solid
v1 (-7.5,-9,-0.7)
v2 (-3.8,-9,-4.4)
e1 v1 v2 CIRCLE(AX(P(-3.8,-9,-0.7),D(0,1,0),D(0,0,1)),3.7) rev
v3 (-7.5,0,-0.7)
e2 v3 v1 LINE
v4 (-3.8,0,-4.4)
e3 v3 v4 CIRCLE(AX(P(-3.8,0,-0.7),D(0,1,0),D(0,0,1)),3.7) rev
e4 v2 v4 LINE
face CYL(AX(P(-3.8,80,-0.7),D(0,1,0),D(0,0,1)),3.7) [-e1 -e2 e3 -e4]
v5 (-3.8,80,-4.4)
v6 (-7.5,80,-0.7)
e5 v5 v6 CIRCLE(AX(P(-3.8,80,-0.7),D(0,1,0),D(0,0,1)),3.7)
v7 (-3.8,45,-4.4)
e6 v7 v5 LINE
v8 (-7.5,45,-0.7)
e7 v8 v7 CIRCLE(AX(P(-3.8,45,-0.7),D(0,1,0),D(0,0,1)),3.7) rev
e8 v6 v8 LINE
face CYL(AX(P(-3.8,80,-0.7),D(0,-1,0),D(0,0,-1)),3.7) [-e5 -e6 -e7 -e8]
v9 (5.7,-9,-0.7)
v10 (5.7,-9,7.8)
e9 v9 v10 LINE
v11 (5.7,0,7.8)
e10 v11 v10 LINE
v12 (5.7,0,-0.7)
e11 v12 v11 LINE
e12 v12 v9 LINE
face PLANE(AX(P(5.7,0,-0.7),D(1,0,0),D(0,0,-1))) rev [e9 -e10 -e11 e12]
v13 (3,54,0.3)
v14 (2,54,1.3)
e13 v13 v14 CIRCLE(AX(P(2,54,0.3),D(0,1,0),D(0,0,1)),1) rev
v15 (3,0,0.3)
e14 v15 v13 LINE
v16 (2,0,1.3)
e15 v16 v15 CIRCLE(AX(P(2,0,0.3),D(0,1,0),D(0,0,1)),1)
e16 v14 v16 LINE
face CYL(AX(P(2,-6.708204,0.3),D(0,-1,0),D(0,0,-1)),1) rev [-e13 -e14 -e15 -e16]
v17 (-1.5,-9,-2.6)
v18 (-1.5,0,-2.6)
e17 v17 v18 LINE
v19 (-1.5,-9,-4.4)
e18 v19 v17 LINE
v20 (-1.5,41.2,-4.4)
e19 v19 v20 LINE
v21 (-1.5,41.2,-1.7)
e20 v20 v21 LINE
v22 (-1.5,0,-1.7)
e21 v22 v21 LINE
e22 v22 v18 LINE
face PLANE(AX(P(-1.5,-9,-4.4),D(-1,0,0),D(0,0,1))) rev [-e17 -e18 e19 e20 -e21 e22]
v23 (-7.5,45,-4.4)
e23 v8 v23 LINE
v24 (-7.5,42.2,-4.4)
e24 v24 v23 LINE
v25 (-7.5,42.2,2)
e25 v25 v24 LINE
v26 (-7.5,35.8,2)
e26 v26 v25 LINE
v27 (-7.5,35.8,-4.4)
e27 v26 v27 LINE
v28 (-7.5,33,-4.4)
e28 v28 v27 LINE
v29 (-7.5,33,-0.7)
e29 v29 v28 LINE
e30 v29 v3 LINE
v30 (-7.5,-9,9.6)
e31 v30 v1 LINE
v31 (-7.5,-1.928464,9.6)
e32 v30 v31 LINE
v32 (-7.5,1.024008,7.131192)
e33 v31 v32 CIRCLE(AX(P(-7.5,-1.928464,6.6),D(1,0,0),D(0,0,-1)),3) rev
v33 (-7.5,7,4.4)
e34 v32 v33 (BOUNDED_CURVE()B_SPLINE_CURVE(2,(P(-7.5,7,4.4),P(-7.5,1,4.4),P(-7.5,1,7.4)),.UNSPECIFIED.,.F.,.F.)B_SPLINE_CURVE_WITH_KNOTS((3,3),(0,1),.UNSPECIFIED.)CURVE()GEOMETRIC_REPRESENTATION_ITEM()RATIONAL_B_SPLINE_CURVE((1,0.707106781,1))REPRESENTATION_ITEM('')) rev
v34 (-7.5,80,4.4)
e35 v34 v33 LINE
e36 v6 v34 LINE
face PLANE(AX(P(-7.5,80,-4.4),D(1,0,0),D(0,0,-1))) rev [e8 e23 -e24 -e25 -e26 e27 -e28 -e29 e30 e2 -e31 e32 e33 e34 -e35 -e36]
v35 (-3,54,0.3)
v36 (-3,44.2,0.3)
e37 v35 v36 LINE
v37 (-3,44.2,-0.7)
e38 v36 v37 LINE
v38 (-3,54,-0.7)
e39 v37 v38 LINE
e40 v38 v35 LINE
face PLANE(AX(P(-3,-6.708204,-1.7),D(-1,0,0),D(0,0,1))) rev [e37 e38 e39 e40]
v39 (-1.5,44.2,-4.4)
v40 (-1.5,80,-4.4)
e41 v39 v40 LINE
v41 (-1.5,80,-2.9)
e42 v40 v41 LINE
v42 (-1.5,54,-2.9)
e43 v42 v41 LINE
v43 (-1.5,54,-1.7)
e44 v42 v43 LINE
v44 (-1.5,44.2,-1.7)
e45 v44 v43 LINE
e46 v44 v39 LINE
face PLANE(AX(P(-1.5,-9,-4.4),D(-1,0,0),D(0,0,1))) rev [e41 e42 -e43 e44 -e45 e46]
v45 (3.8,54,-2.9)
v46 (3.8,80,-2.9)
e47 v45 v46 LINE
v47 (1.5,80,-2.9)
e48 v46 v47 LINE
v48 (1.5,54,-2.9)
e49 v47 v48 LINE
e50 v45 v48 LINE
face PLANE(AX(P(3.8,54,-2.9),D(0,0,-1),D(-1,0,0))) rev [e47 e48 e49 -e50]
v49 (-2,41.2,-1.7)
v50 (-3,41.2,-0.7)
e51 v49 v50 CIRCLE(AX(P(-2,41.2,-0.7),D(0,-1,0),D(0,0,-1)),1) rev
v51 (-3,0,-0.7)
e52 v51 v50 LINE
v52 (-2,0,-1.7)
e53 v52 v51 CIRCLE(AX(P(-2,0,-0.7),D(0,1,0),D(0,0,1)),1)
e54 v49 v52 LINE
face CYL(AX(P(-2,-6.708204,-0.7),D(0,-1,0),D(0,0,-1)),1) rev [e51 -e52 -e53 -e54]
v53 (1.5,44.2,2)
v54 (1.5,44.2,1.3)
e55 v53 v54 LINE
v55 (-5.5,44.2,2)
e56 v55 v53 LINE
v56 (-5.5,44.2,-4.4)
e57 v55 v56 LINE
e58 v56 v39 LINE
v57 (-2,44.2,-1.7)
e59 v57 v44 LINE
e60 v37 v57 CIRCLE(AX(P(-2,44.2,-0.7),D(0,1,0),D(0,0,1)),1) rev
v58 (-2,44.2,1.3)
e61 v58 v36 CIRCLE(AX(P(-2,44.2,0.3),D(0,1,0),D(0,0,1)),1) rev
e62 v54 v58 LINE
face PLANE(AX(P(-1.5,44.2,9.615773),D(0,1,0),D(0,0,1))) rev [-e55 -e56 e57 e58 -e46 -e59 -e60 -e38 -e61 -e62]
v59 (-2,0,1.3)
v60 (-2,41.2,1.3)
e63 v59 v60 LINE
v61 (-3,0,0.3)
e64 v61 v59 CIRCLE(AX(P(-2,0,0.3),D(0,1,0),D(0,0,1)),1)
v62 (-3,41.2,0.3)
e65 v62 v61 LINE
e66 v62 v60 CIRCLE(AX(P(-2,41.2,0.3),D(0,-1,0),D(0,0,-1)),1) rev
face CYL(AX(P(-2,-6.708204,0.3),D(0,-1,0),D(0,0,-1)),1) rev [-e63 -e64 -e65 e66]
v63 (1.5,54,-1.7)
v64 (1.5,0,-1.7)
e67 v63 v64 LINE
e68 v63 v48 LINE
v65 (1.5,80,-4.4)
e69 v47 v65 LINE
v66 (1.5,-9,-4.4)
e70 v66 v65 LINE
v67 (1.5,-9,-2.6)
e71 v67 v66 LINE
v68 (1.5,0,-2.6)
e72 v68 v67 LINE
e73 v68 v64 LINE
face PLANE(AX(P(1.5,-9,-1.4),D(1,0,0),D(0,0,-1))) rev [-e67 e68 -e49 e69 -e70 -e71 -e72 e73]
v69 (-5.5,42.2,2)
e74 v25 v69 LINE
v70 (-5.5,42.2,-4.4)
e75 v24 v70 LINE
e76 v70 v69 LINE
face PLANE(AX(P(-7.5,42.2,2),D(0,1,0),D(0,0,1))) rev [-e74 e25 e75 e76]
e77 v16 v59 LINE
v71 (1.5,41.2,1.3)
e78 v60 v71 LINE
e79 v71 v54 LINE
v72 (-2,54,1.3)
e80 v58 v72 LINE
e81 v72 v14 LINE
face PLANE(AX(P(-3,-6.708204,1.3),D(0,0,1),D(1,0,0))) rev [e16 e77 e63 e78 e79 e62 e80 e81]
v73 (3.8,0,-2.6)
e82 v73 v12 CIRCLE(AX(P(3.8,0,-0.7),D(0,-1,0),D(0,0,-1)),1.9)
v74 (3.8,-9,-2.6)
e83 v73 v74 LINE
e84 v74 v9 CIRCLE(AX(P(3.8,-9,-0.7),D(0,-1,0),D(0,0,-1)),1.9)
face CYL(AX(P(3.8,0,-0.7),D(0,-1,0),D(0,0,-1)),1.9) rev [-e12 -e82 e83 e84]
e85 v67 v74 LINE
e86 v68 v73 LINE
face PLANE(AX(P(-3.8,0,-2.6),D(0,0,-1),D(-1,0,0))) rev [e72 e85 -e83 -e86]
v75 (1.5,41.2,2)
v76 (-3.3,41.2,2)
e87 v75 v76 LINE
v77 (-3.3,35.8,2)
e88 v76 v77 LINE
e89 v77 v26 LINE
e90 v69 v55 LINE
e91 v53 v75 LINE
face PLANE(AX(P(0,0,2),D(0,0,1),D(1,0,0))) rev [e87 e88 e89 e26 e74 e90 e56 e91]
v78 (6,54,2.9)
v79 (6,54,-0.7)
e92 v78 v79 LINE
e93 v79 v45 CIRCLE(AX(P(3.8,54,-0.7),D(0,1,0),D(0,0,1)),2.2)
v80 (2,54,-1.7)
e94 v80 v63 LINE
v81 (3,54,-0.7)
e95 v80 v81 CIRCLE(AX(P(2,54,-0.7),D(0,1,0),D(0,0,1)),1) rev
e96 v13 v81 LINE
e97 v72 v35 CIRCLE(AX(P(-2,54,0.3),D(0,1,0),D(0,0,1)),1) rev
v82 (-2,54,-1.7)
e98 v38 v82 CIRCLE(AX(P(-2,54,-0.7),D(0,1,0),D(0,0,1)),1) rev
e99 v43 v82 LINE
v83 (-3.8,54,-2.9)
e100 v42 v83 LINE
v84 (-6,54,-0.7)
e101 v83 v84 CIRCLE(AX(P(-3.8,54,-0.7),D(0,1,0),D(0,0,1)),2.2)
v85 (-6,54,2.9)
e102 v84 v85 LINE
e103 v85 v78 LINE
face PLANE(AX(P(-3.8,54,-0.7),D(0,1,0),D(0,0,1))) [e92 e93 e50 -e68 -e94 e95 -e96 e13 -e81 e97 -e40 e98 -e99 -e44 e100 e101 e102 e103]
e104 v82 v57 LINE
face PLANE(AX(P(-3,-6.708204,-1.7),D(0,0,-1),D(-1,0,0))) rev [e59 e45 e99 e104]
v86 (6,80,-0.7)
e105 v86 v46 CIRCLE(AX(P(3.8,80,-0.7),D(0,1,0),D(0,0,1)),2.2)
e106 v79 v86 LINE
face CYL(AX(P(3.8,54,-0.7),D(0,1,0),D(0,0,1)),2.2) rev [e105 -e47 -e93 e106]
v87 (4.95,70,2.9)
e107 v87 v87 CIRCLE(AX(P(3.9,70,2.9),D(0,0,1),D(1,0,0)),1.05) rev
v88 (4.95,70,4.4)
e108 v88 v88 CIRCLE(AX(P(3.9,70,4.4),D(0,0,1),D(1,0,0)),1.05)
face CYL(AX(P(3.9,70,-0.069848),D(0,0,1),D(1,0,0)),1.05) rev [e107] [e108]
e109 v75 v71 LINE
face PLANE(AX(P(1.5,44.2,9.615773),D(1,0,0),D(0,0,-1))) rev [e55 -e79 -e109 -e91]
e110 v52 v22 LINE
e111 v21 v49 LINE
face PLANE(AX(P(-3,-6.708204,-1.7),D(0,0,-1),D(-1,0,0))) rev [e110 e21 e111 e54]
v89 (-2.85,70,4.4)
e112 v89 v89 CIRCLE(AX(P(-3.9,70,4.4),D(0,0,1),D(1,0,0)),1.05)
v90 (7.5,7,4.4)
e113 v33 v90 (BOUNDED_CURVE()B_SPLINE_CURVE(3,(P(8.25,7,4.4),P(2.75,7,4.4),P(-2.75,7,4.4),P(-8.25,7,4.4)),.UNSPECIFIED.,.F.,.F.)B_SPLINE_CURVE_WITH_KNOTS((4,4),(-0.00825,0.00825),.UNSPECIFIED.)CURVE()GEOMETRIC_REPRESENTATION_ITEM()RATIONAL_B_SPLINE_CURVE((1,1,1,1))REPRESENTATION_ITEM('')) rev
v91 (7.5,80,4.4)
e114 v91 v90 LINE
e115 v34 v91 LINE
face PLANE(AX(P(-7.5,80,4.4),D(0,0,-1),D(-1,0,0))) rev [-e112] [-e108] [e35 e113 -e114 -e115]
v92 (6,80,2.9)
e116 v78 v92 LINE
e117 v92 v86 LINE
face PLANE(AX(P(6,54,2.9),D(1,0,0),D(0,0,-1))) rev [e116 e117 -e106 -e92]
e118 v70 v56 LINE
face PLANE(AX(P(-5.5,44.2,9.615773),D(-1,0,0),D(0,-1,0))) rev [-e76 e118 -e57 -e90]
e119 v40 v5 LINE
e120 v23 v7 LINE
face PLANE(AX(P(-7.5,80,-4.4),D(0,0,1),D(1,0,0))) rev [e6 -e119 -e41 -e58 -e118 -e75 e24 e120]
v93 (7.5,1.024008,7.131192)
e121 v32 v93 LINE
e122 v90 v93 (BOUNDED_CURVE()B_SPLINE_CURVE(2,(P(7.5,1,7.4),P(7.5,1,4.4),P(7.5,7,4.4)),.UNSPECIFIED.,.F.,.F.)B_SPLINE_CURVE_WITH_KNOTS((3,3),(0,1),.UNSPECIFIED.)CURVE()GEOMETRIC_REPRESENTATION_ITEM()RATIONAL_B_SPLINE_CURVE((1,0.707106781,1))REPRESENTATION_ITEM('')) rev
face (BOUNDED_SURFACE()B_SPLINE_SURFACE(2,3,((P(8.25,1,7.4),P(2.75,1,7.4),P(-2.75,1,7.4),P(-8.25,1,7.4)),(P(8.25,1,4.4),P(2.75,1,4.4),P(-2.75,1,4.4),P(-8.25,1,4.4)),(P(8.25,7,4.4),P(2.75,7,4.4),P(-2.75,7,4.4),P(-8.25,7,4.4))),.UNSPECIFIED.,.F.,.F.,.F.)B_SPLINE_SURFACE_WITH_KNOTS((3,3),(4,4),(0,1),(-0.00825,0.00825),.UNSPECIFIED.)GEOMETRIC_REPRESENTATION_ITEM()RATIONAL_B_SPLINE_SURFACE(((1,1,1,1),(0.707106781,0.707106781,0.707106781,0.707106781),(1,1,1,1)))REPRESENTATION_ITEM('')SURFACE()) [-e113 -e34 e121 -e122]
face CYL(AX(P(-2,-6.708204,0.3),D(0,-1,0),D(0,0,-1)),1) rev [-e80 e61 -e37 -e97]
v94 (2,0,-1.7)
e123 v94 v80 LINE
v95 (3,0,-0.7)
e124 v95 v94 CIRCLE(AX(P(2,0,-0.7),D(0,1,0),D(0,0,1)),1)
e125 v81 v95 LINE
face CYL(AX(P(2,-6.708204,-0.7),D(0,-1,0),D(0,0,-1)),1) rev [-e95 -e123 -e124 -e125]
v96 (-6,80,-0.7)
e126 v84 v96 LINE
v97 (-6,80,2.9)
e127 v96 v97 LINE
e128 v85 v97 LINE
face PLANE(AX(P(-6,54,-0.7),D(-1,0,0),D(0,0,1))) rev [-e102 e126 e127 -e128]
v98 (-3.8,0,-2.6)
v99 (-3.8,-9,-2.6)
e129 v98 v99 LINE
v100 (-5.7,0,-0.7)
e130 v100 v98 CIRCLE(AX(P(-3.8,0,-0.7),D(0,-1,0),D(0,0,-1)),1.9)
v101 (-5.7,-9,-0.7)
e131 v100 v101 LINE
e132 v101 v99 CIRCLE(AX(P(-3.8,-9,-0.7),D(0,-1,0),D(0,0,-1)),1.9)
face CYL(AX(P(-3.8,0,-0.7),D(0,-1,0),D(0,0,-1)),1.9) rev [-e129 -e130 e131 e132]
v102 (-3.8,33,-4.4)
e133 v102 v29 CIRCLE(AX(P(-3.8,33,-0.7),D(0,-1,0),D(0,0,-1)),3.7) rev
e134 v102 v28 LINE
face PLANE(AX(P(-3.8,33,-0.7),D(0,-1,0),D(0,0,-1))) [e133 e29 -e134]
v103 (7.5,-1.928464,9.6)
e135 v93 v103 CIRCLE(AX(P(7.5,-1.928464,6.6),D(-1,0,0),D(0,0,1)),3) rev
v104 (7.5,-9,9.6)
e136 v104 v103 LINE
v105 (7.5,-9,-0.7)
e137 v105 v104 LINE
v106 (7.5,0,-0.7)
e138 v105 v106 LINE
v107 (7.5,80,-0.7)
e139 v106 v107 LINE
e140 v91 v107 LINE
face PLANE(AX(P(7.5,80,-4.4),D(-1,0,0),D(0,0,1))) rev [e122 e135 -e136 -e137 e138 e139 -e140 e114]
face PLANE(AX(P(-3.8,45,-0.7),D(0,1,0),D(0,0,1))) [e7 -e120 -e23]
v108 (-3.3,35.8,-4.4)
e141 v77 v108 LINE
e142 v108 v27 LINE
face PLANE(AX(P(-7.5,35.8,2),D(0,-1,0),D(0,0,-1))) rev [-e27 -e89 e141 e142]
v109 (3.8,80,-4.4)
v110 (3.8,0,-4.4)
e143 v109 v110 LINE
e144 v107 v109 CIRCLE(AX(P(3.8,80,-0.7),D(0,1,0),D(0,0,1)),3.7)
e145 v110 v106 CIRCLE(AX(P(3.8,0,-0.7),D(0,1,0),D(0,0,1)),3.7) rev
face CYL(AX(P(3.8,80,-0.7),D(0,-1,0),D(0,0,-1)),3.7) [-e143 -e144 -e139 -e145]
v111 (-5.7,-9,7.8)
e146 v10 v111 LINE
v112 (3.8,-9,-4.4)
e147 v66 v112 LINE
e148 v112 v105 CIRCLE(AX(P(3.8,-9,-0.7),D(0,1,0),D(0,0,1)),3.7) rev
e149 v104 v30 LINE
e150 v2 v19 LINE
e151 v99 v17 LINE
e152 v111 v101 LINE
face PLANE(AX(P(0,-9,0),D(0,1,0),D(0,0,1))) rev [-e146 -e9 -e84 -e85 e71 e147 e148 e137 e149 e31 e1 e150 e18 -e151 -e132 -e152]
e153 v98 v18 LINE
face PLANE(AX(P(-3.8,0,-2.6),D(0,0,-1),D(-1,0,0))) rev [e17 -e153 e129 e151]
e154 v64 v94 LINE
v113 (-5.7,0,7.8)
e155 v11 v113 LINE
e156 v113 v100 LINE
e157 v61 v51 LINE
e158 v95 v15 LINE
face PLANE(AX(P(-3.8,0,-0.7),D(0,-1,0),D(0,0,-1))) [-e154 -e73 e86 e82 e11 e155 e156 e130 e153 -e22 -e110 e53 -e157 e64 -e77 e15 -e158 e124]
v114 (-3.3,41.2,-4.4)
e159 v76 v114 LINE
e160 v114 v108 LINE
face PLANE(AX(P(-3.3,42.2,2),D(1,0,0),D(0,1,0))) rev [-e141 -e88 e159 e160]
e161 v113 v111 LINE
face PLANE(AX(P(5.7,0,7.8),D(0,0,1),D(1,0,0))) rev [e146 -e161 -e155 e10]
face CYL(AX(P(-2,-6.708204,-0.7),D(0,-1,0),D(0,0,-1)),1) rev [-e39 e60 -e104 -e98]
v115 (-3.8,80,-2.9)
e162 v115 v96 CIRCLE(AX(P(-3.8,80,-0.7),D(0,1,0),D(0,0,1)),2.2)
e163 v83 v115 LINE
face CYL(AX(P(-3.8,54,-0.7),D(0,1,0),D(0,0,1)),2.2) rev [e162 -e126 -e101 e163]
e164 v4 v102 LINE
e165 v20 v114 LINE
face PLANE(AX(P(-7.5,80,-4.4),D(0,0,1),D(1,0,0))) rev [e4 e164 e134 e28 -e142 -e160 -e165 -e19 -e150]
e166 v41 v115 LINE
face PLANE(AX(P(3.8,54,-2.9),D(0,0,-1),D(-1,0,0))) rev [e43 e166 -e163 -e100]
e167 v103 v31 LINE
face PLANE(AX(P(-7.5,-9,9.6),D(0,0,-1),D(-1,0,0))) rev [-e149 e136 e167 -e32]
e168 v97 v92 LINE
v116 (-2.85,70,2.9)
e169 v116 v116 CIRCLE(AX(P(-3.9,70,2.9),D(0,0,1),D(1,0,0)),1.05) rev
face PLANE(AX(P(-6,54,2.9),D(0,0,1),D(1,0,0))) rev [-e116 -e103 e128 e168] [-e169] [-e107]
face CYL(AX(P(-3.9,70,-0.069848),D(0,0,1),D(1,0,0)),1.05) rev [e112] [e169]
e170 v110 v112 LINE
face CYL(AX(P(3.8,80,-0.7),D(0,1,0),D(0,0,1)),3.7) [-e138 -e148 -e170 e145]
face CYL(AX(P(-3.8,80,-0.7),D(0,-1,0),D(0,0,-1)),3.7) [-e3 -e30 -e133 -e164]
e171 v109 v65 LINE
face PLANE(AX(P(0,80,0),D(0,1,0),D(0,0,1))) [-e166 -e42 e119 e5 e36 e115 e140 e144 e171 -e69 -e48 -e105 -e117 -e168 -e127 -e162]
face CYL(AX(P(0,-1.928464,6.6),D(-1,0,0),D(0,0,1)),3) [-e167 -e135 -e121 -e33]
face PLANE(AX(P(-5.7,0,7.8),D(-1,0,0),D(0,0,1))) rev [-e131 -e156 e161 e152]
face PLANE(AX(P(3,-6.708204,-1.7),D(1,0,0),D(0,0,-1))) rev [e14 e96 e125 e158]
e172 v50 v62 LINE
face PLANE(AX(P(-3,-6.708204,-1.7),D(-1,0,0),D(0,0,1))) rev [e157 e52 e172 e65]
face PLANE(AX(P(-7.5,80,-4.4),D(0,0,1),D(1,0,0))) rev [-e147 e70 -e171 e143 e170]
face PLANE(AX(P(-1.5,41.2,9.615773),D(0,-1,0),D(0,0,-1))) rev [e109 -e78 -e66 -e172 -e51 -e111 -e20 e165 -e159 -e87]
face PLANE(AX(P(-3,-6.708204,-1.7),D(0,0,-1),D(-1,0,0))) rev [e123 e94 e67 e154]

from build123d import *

# Parameters (mm, degrees)
BOSS_EXTRUDE1_DEPTH = 80
FILLET1_R           = 3.7
CUT_EXTRUDE1_DEPTH  = 26
SKETCH4_R           = 1.0499999999999892
SKETCH4_R_2         = 1.0499999999999914
CUT_EXTRUDE2_DEPTH  = 1.5
CUT_EXTRUDE3_DEPTH  = 54
FILLET2_R           = 1
SKETCH6_W           = 15
SKETCH6_H           = 14.000000000000002
BOSS_EXTRUDE2_DEPTH = 9
FILLET3_R           = 3.7
CUT_EXTRUDE4_DEPTH  = 9
SKETCH9_W           = 3
SKETCH9_H           = 3
CUT_EXTRUDE6_DEPTH  = 90.82989480122973
SKETCH10_W          = 15
SKETCH10_H          = 5.200000000000001
BOSS_EXTRUDE3_DEPTH = 1
FILLET8_SIZE        = 6
FILLET8_SIZE_2      = 3
FILLET9_R           = 3
BOSS_EXTRUDE5_START = -3.7
BOSS_EXTRUDE5_DEPTH = 3.7
CUT_EXTRUDE7_DEPTH  = 6.4
CUT_EXTRUDE8_REACH  = 83.561


with BuildPart() as part:
    # Sketch1 → Boss-Extrude1 (new body)
    with BuildSketch(Plane(origin=(0, 0, 0), x_dir=(1, 0, 0), z_dir=(0, 1, 0))):
        Polygon((-7.499999999999999, 4.4), (7.500000000000001, 4.4), (7.500000000000003, -4.4), (-7.499999999999998, -4.4), align=None)
    extrude(amount=BOSS_EXTRUDE1_DEPTH)

    # Fillet1
    fillet1_edges = [part.edges().sort_by_distance(p)[0] for p in [
        (-7.499999999999999, 40, -4.4),
        (7.500000000000001, 40, -4.4),
    ]]
    fillet(fillet1_edges, radius=FILLET1_R)

    # Sketch3 → Cut-Extrude1 (cut)
    with BuildSketch(Plane(origin=(0, 80, 0), x_dir=(1, 0, 0), z_dir=(0, 1, 0))):
        with BuildLine():
            Line((-5.999999999999998, 0.6999999999999998), (-5.999999999999997, -2.9000000000000004))
            Line((-5.999999999999997, -2.9000000000000004), (6.000000000000002, -2.9000000000000004))
            Line((6.000000000000002, -2.9000000000000004), (6.000000000000001, 0.700000000000001))
            ThreePointArc((6.000000000000001, 0.700000000000001), (5.355634918610405, 2.255634918610405), (3.8000000000000007, 2.900000000000001))
            Line((3.8000000000000007, 2.900000000000001), (-3.7999999999999985, 2.9000000000000004))
            ThreePointArc((-3.7999999999999985, 2.9000000000000004), (-5.355634918610402, 2.2556349186104048), (-5.999999999999998, 0.6999999999999998))
        make_face()
    extrude(amount=-CUT_EXTRUDE1_DEPTH, mode=Mode.SUBTRACT)

    # Sketch4 → Cut-Extrude2 (cut)
    with BuildSketch(Plane.XY.offset(4.4)):
        with Locations((-3.899999999999998, 70)):
            Circle(SKETCH4_R)
        with Locations((3.9000000000000026, 70)):
            Circle(SKETCH4_R_2)
    extrude(amount=-CUT_EXTRUDE2_DEPTH, mode=Mode.SUBTRACT)

    # Sketch5 → Cut-Extrude3 (cut)
    with BuildSketch(Plane(origin=(0, 54.00000000000001, 0), x_dir=(1, 0, 0), z_dir=(0, 1, 0))):
        Polygon((-2.9999999999999996, 1.7000000000000008), (3.0000000000000004, 1.7000000000000008), (3.0000000000000004, -1.2999999999999994), (-2.999999999999999, -1.2999999999999994), align=None)
    extrude(amount=-CUT_EXTRUDE3_DEPTH, mode=Mode.SUBTRACT)

    # Fillet2
    fillet2_edges = [part.edges().sort_by_distance(p)[0] for p in [
        (3.0000000000000004, 27.000000000000007, -1.7000000000000008),
        (3.0000000000000004, 27.000000000000007, 1.2999999999999994),
        (-2.999999999999999, 27.000000000000007, 1.2999999999999994),
        (-2.9999999999999996, 27.000000000000007, -1.7000000000000008),
    ]]
    fillet(fillet2_edges, radius=FILLET2_R)

    # Sketch6 → Boss-Extrude2 (add)
    with BuildSketch(Plane.XZ):
        with Locations((1.78e-15, 2.6000000000000005)):
            Rectangle(SKETCH6_W, SKETCH6_H)
    extrude(amount=BOSS_EXTRUDE2_DEPTH)

    # Fillet3
    fillet3_edges = [part.edges().sort_by_distance(p)[0] for p in [
        (7.500000000000002, -4.5, -4.4),
        (-7.499999999999998, -4.5, -4.4),
    ]]
    fillet(fillet3_edges, radius=FILLET3_R)

    # Sketch7 → Cut-Extrude4 (cut)
    with BuildSketch(Plane.XZ.offset(9)):
        with BuildLine():
            Line((-3.799999999999998, -2.6000000000000005), (3.8000000000000007, -2.6000000000000005))
            ThreePointArc((3.8000000000000007, -2.6000000000000005), (5.143502884254442, -2.0435028842544405), (5.700000000000002, -0.6999999999999998))
            Line((5.700000000000002, -0.6999999999999998), (5.700000000000002, 7.800000000000002))
            Line((5.700000000000002, 7.800000000000002), (-5.699999999999998, 7.800000000000002))
            Line((-5.699999999999998, 7.800000000000002), (-5.699999999999998, -0.6999999999999998))
            ThreePointArc((-5.699999999999998, -0.6999999999999998), (-5.143502884254438, -2.0435028842544405), (-3.799999999999998, -2.6000000000000005))
        make_face()
    extrude(amount=-CUT_EXTRUDE4_DEPTH, mode=Mode.SUBTRACT)

    # Sketch9 → Cut-Extrude6 (cut, through all)
    with BuildSketch(Plane(origin=(0, 80, 0), x_dir=(1, 0, 0), z_dir=(0, 1, 0))):
        with Locations((0, 2.9000000000000012)):
            Rectangle(SKETCH9_W, SKETCH9_H)
    extrude(amount=-CUT_EXTRUDE6_DEPTH, mode=Mode.SUBTRACT)

    # Sketch10 → Boss-Extrude3 (add)
    with BuildSketch(Plane(origin=(0, 0, 0), x_dir=(1, 0, 0), z_dir=(0, 1, 0))):
        with Locations((1.78e-15, -7.000000000000001)):
            Rectangle(SKETCH10_W, SKETCH10_H)
    extrude(amount=BOSS_EXTRUDE3_DEPTH)

    # Fillet8
    # an asymmetric fillet: 6, 3 mm, written as the material it adds along each edge
    with BuildSketch(Plane(origin=(-7.499999999999998, 1, 4.4), x_dir=(0, 1, 0), z_dir=(1, 0, 0))) as fillet8_piece_1:
        with BuildLine():
            Bezier((FILLET8_SIZE, 0), (8.9e-16, 0), (0, FILLET8_SIZE_2), weights=[1, 0.7071067811865476, 1])
            Line((0, FILLET8_SIZE_2), (0, 0))
            Line((0, 0), (FILLET8_SIZE, 0))
        make_face()
    extrude(amount=15)

    # Fillet9
    fillet9_edges = [part.edges().sort_by_distance(p)[0] for p in [
        (1.78e-15, 1, 9.600000000000001),
    ]]
    fillet(fillet9_edges, radius=FILLET9_R)

    # Sketch11 → Boss-Extrude5 (add)
    with BuildSketch(Plane(origin=(0, 0, -4.4), x_dir=(-1, 0, 0), z_dir=(0, 0, -1)).offset(BOSS_EXTRUDE5_START)):
        Polygon((3.799999999999998, 45), (7.5, 45), (7.499999999999999, 33), (3.8000000000000003, 33), align=None)
    extrude(amount=BOSS_EXTRUDE5_DEPTH)

    # Sketch12 → Cut-Extrude7 (cut)
    with BuildSketch(Plane(origin=(0, 0, -4.4), x_dir=(-1, 0, 0), z_dir=(0, 0, -1))):
        Polygon((7.499999999999999, 42.2), (3.299999999999998, 42.2), (3.299999999999999, 35.8), (7.5, 35.8), align=None)
    extrude(amount=-CUT_EXTRUDE7_DEPTH, mode=Mode.SUBTRACT)

    # Cut-Extrude8: up to this face of the body (flat: up to its plane)
    cut_extrude8_end = Plane(part.part.faces().sort_by_distance((-5.4, 39, 2))[0])
    # Sketch13 → Cut-Extrude8 (cut, up to the picked face)
    with BuildSketch(Plane(origin=(0, 0, -4.4), x_dir=(-1, 0, 0), z_dir=(0, 0, -1)), mode=Mode.PRIVATE) as cut_extrude8_sk1:
        Polygon((1.5, 44.2), (5.5, 44.2), (5.500000000000001, 41.2), (1.5000000000000004, 41.2), (-1.5, 41.2), (-1.5, 44.2), align=None)
    cut_extrude8_tool1 = split(extrude(cut_extrude8_sk1.sketch, amount=-CUT_EXTRUDE8_REACH, mode=Mode.PRIVATE), bisect_by=cut_extrude8_end, keep=Keep.BOTH, mode=Mode.PRIVATE)
    add(cut_extrude8_tool1.solids().sort_by(Axis((-2, 42.7, -4.4), (0, 0, 1)))[0], mode=Mode.SUBTRACT)


solid = part.part
